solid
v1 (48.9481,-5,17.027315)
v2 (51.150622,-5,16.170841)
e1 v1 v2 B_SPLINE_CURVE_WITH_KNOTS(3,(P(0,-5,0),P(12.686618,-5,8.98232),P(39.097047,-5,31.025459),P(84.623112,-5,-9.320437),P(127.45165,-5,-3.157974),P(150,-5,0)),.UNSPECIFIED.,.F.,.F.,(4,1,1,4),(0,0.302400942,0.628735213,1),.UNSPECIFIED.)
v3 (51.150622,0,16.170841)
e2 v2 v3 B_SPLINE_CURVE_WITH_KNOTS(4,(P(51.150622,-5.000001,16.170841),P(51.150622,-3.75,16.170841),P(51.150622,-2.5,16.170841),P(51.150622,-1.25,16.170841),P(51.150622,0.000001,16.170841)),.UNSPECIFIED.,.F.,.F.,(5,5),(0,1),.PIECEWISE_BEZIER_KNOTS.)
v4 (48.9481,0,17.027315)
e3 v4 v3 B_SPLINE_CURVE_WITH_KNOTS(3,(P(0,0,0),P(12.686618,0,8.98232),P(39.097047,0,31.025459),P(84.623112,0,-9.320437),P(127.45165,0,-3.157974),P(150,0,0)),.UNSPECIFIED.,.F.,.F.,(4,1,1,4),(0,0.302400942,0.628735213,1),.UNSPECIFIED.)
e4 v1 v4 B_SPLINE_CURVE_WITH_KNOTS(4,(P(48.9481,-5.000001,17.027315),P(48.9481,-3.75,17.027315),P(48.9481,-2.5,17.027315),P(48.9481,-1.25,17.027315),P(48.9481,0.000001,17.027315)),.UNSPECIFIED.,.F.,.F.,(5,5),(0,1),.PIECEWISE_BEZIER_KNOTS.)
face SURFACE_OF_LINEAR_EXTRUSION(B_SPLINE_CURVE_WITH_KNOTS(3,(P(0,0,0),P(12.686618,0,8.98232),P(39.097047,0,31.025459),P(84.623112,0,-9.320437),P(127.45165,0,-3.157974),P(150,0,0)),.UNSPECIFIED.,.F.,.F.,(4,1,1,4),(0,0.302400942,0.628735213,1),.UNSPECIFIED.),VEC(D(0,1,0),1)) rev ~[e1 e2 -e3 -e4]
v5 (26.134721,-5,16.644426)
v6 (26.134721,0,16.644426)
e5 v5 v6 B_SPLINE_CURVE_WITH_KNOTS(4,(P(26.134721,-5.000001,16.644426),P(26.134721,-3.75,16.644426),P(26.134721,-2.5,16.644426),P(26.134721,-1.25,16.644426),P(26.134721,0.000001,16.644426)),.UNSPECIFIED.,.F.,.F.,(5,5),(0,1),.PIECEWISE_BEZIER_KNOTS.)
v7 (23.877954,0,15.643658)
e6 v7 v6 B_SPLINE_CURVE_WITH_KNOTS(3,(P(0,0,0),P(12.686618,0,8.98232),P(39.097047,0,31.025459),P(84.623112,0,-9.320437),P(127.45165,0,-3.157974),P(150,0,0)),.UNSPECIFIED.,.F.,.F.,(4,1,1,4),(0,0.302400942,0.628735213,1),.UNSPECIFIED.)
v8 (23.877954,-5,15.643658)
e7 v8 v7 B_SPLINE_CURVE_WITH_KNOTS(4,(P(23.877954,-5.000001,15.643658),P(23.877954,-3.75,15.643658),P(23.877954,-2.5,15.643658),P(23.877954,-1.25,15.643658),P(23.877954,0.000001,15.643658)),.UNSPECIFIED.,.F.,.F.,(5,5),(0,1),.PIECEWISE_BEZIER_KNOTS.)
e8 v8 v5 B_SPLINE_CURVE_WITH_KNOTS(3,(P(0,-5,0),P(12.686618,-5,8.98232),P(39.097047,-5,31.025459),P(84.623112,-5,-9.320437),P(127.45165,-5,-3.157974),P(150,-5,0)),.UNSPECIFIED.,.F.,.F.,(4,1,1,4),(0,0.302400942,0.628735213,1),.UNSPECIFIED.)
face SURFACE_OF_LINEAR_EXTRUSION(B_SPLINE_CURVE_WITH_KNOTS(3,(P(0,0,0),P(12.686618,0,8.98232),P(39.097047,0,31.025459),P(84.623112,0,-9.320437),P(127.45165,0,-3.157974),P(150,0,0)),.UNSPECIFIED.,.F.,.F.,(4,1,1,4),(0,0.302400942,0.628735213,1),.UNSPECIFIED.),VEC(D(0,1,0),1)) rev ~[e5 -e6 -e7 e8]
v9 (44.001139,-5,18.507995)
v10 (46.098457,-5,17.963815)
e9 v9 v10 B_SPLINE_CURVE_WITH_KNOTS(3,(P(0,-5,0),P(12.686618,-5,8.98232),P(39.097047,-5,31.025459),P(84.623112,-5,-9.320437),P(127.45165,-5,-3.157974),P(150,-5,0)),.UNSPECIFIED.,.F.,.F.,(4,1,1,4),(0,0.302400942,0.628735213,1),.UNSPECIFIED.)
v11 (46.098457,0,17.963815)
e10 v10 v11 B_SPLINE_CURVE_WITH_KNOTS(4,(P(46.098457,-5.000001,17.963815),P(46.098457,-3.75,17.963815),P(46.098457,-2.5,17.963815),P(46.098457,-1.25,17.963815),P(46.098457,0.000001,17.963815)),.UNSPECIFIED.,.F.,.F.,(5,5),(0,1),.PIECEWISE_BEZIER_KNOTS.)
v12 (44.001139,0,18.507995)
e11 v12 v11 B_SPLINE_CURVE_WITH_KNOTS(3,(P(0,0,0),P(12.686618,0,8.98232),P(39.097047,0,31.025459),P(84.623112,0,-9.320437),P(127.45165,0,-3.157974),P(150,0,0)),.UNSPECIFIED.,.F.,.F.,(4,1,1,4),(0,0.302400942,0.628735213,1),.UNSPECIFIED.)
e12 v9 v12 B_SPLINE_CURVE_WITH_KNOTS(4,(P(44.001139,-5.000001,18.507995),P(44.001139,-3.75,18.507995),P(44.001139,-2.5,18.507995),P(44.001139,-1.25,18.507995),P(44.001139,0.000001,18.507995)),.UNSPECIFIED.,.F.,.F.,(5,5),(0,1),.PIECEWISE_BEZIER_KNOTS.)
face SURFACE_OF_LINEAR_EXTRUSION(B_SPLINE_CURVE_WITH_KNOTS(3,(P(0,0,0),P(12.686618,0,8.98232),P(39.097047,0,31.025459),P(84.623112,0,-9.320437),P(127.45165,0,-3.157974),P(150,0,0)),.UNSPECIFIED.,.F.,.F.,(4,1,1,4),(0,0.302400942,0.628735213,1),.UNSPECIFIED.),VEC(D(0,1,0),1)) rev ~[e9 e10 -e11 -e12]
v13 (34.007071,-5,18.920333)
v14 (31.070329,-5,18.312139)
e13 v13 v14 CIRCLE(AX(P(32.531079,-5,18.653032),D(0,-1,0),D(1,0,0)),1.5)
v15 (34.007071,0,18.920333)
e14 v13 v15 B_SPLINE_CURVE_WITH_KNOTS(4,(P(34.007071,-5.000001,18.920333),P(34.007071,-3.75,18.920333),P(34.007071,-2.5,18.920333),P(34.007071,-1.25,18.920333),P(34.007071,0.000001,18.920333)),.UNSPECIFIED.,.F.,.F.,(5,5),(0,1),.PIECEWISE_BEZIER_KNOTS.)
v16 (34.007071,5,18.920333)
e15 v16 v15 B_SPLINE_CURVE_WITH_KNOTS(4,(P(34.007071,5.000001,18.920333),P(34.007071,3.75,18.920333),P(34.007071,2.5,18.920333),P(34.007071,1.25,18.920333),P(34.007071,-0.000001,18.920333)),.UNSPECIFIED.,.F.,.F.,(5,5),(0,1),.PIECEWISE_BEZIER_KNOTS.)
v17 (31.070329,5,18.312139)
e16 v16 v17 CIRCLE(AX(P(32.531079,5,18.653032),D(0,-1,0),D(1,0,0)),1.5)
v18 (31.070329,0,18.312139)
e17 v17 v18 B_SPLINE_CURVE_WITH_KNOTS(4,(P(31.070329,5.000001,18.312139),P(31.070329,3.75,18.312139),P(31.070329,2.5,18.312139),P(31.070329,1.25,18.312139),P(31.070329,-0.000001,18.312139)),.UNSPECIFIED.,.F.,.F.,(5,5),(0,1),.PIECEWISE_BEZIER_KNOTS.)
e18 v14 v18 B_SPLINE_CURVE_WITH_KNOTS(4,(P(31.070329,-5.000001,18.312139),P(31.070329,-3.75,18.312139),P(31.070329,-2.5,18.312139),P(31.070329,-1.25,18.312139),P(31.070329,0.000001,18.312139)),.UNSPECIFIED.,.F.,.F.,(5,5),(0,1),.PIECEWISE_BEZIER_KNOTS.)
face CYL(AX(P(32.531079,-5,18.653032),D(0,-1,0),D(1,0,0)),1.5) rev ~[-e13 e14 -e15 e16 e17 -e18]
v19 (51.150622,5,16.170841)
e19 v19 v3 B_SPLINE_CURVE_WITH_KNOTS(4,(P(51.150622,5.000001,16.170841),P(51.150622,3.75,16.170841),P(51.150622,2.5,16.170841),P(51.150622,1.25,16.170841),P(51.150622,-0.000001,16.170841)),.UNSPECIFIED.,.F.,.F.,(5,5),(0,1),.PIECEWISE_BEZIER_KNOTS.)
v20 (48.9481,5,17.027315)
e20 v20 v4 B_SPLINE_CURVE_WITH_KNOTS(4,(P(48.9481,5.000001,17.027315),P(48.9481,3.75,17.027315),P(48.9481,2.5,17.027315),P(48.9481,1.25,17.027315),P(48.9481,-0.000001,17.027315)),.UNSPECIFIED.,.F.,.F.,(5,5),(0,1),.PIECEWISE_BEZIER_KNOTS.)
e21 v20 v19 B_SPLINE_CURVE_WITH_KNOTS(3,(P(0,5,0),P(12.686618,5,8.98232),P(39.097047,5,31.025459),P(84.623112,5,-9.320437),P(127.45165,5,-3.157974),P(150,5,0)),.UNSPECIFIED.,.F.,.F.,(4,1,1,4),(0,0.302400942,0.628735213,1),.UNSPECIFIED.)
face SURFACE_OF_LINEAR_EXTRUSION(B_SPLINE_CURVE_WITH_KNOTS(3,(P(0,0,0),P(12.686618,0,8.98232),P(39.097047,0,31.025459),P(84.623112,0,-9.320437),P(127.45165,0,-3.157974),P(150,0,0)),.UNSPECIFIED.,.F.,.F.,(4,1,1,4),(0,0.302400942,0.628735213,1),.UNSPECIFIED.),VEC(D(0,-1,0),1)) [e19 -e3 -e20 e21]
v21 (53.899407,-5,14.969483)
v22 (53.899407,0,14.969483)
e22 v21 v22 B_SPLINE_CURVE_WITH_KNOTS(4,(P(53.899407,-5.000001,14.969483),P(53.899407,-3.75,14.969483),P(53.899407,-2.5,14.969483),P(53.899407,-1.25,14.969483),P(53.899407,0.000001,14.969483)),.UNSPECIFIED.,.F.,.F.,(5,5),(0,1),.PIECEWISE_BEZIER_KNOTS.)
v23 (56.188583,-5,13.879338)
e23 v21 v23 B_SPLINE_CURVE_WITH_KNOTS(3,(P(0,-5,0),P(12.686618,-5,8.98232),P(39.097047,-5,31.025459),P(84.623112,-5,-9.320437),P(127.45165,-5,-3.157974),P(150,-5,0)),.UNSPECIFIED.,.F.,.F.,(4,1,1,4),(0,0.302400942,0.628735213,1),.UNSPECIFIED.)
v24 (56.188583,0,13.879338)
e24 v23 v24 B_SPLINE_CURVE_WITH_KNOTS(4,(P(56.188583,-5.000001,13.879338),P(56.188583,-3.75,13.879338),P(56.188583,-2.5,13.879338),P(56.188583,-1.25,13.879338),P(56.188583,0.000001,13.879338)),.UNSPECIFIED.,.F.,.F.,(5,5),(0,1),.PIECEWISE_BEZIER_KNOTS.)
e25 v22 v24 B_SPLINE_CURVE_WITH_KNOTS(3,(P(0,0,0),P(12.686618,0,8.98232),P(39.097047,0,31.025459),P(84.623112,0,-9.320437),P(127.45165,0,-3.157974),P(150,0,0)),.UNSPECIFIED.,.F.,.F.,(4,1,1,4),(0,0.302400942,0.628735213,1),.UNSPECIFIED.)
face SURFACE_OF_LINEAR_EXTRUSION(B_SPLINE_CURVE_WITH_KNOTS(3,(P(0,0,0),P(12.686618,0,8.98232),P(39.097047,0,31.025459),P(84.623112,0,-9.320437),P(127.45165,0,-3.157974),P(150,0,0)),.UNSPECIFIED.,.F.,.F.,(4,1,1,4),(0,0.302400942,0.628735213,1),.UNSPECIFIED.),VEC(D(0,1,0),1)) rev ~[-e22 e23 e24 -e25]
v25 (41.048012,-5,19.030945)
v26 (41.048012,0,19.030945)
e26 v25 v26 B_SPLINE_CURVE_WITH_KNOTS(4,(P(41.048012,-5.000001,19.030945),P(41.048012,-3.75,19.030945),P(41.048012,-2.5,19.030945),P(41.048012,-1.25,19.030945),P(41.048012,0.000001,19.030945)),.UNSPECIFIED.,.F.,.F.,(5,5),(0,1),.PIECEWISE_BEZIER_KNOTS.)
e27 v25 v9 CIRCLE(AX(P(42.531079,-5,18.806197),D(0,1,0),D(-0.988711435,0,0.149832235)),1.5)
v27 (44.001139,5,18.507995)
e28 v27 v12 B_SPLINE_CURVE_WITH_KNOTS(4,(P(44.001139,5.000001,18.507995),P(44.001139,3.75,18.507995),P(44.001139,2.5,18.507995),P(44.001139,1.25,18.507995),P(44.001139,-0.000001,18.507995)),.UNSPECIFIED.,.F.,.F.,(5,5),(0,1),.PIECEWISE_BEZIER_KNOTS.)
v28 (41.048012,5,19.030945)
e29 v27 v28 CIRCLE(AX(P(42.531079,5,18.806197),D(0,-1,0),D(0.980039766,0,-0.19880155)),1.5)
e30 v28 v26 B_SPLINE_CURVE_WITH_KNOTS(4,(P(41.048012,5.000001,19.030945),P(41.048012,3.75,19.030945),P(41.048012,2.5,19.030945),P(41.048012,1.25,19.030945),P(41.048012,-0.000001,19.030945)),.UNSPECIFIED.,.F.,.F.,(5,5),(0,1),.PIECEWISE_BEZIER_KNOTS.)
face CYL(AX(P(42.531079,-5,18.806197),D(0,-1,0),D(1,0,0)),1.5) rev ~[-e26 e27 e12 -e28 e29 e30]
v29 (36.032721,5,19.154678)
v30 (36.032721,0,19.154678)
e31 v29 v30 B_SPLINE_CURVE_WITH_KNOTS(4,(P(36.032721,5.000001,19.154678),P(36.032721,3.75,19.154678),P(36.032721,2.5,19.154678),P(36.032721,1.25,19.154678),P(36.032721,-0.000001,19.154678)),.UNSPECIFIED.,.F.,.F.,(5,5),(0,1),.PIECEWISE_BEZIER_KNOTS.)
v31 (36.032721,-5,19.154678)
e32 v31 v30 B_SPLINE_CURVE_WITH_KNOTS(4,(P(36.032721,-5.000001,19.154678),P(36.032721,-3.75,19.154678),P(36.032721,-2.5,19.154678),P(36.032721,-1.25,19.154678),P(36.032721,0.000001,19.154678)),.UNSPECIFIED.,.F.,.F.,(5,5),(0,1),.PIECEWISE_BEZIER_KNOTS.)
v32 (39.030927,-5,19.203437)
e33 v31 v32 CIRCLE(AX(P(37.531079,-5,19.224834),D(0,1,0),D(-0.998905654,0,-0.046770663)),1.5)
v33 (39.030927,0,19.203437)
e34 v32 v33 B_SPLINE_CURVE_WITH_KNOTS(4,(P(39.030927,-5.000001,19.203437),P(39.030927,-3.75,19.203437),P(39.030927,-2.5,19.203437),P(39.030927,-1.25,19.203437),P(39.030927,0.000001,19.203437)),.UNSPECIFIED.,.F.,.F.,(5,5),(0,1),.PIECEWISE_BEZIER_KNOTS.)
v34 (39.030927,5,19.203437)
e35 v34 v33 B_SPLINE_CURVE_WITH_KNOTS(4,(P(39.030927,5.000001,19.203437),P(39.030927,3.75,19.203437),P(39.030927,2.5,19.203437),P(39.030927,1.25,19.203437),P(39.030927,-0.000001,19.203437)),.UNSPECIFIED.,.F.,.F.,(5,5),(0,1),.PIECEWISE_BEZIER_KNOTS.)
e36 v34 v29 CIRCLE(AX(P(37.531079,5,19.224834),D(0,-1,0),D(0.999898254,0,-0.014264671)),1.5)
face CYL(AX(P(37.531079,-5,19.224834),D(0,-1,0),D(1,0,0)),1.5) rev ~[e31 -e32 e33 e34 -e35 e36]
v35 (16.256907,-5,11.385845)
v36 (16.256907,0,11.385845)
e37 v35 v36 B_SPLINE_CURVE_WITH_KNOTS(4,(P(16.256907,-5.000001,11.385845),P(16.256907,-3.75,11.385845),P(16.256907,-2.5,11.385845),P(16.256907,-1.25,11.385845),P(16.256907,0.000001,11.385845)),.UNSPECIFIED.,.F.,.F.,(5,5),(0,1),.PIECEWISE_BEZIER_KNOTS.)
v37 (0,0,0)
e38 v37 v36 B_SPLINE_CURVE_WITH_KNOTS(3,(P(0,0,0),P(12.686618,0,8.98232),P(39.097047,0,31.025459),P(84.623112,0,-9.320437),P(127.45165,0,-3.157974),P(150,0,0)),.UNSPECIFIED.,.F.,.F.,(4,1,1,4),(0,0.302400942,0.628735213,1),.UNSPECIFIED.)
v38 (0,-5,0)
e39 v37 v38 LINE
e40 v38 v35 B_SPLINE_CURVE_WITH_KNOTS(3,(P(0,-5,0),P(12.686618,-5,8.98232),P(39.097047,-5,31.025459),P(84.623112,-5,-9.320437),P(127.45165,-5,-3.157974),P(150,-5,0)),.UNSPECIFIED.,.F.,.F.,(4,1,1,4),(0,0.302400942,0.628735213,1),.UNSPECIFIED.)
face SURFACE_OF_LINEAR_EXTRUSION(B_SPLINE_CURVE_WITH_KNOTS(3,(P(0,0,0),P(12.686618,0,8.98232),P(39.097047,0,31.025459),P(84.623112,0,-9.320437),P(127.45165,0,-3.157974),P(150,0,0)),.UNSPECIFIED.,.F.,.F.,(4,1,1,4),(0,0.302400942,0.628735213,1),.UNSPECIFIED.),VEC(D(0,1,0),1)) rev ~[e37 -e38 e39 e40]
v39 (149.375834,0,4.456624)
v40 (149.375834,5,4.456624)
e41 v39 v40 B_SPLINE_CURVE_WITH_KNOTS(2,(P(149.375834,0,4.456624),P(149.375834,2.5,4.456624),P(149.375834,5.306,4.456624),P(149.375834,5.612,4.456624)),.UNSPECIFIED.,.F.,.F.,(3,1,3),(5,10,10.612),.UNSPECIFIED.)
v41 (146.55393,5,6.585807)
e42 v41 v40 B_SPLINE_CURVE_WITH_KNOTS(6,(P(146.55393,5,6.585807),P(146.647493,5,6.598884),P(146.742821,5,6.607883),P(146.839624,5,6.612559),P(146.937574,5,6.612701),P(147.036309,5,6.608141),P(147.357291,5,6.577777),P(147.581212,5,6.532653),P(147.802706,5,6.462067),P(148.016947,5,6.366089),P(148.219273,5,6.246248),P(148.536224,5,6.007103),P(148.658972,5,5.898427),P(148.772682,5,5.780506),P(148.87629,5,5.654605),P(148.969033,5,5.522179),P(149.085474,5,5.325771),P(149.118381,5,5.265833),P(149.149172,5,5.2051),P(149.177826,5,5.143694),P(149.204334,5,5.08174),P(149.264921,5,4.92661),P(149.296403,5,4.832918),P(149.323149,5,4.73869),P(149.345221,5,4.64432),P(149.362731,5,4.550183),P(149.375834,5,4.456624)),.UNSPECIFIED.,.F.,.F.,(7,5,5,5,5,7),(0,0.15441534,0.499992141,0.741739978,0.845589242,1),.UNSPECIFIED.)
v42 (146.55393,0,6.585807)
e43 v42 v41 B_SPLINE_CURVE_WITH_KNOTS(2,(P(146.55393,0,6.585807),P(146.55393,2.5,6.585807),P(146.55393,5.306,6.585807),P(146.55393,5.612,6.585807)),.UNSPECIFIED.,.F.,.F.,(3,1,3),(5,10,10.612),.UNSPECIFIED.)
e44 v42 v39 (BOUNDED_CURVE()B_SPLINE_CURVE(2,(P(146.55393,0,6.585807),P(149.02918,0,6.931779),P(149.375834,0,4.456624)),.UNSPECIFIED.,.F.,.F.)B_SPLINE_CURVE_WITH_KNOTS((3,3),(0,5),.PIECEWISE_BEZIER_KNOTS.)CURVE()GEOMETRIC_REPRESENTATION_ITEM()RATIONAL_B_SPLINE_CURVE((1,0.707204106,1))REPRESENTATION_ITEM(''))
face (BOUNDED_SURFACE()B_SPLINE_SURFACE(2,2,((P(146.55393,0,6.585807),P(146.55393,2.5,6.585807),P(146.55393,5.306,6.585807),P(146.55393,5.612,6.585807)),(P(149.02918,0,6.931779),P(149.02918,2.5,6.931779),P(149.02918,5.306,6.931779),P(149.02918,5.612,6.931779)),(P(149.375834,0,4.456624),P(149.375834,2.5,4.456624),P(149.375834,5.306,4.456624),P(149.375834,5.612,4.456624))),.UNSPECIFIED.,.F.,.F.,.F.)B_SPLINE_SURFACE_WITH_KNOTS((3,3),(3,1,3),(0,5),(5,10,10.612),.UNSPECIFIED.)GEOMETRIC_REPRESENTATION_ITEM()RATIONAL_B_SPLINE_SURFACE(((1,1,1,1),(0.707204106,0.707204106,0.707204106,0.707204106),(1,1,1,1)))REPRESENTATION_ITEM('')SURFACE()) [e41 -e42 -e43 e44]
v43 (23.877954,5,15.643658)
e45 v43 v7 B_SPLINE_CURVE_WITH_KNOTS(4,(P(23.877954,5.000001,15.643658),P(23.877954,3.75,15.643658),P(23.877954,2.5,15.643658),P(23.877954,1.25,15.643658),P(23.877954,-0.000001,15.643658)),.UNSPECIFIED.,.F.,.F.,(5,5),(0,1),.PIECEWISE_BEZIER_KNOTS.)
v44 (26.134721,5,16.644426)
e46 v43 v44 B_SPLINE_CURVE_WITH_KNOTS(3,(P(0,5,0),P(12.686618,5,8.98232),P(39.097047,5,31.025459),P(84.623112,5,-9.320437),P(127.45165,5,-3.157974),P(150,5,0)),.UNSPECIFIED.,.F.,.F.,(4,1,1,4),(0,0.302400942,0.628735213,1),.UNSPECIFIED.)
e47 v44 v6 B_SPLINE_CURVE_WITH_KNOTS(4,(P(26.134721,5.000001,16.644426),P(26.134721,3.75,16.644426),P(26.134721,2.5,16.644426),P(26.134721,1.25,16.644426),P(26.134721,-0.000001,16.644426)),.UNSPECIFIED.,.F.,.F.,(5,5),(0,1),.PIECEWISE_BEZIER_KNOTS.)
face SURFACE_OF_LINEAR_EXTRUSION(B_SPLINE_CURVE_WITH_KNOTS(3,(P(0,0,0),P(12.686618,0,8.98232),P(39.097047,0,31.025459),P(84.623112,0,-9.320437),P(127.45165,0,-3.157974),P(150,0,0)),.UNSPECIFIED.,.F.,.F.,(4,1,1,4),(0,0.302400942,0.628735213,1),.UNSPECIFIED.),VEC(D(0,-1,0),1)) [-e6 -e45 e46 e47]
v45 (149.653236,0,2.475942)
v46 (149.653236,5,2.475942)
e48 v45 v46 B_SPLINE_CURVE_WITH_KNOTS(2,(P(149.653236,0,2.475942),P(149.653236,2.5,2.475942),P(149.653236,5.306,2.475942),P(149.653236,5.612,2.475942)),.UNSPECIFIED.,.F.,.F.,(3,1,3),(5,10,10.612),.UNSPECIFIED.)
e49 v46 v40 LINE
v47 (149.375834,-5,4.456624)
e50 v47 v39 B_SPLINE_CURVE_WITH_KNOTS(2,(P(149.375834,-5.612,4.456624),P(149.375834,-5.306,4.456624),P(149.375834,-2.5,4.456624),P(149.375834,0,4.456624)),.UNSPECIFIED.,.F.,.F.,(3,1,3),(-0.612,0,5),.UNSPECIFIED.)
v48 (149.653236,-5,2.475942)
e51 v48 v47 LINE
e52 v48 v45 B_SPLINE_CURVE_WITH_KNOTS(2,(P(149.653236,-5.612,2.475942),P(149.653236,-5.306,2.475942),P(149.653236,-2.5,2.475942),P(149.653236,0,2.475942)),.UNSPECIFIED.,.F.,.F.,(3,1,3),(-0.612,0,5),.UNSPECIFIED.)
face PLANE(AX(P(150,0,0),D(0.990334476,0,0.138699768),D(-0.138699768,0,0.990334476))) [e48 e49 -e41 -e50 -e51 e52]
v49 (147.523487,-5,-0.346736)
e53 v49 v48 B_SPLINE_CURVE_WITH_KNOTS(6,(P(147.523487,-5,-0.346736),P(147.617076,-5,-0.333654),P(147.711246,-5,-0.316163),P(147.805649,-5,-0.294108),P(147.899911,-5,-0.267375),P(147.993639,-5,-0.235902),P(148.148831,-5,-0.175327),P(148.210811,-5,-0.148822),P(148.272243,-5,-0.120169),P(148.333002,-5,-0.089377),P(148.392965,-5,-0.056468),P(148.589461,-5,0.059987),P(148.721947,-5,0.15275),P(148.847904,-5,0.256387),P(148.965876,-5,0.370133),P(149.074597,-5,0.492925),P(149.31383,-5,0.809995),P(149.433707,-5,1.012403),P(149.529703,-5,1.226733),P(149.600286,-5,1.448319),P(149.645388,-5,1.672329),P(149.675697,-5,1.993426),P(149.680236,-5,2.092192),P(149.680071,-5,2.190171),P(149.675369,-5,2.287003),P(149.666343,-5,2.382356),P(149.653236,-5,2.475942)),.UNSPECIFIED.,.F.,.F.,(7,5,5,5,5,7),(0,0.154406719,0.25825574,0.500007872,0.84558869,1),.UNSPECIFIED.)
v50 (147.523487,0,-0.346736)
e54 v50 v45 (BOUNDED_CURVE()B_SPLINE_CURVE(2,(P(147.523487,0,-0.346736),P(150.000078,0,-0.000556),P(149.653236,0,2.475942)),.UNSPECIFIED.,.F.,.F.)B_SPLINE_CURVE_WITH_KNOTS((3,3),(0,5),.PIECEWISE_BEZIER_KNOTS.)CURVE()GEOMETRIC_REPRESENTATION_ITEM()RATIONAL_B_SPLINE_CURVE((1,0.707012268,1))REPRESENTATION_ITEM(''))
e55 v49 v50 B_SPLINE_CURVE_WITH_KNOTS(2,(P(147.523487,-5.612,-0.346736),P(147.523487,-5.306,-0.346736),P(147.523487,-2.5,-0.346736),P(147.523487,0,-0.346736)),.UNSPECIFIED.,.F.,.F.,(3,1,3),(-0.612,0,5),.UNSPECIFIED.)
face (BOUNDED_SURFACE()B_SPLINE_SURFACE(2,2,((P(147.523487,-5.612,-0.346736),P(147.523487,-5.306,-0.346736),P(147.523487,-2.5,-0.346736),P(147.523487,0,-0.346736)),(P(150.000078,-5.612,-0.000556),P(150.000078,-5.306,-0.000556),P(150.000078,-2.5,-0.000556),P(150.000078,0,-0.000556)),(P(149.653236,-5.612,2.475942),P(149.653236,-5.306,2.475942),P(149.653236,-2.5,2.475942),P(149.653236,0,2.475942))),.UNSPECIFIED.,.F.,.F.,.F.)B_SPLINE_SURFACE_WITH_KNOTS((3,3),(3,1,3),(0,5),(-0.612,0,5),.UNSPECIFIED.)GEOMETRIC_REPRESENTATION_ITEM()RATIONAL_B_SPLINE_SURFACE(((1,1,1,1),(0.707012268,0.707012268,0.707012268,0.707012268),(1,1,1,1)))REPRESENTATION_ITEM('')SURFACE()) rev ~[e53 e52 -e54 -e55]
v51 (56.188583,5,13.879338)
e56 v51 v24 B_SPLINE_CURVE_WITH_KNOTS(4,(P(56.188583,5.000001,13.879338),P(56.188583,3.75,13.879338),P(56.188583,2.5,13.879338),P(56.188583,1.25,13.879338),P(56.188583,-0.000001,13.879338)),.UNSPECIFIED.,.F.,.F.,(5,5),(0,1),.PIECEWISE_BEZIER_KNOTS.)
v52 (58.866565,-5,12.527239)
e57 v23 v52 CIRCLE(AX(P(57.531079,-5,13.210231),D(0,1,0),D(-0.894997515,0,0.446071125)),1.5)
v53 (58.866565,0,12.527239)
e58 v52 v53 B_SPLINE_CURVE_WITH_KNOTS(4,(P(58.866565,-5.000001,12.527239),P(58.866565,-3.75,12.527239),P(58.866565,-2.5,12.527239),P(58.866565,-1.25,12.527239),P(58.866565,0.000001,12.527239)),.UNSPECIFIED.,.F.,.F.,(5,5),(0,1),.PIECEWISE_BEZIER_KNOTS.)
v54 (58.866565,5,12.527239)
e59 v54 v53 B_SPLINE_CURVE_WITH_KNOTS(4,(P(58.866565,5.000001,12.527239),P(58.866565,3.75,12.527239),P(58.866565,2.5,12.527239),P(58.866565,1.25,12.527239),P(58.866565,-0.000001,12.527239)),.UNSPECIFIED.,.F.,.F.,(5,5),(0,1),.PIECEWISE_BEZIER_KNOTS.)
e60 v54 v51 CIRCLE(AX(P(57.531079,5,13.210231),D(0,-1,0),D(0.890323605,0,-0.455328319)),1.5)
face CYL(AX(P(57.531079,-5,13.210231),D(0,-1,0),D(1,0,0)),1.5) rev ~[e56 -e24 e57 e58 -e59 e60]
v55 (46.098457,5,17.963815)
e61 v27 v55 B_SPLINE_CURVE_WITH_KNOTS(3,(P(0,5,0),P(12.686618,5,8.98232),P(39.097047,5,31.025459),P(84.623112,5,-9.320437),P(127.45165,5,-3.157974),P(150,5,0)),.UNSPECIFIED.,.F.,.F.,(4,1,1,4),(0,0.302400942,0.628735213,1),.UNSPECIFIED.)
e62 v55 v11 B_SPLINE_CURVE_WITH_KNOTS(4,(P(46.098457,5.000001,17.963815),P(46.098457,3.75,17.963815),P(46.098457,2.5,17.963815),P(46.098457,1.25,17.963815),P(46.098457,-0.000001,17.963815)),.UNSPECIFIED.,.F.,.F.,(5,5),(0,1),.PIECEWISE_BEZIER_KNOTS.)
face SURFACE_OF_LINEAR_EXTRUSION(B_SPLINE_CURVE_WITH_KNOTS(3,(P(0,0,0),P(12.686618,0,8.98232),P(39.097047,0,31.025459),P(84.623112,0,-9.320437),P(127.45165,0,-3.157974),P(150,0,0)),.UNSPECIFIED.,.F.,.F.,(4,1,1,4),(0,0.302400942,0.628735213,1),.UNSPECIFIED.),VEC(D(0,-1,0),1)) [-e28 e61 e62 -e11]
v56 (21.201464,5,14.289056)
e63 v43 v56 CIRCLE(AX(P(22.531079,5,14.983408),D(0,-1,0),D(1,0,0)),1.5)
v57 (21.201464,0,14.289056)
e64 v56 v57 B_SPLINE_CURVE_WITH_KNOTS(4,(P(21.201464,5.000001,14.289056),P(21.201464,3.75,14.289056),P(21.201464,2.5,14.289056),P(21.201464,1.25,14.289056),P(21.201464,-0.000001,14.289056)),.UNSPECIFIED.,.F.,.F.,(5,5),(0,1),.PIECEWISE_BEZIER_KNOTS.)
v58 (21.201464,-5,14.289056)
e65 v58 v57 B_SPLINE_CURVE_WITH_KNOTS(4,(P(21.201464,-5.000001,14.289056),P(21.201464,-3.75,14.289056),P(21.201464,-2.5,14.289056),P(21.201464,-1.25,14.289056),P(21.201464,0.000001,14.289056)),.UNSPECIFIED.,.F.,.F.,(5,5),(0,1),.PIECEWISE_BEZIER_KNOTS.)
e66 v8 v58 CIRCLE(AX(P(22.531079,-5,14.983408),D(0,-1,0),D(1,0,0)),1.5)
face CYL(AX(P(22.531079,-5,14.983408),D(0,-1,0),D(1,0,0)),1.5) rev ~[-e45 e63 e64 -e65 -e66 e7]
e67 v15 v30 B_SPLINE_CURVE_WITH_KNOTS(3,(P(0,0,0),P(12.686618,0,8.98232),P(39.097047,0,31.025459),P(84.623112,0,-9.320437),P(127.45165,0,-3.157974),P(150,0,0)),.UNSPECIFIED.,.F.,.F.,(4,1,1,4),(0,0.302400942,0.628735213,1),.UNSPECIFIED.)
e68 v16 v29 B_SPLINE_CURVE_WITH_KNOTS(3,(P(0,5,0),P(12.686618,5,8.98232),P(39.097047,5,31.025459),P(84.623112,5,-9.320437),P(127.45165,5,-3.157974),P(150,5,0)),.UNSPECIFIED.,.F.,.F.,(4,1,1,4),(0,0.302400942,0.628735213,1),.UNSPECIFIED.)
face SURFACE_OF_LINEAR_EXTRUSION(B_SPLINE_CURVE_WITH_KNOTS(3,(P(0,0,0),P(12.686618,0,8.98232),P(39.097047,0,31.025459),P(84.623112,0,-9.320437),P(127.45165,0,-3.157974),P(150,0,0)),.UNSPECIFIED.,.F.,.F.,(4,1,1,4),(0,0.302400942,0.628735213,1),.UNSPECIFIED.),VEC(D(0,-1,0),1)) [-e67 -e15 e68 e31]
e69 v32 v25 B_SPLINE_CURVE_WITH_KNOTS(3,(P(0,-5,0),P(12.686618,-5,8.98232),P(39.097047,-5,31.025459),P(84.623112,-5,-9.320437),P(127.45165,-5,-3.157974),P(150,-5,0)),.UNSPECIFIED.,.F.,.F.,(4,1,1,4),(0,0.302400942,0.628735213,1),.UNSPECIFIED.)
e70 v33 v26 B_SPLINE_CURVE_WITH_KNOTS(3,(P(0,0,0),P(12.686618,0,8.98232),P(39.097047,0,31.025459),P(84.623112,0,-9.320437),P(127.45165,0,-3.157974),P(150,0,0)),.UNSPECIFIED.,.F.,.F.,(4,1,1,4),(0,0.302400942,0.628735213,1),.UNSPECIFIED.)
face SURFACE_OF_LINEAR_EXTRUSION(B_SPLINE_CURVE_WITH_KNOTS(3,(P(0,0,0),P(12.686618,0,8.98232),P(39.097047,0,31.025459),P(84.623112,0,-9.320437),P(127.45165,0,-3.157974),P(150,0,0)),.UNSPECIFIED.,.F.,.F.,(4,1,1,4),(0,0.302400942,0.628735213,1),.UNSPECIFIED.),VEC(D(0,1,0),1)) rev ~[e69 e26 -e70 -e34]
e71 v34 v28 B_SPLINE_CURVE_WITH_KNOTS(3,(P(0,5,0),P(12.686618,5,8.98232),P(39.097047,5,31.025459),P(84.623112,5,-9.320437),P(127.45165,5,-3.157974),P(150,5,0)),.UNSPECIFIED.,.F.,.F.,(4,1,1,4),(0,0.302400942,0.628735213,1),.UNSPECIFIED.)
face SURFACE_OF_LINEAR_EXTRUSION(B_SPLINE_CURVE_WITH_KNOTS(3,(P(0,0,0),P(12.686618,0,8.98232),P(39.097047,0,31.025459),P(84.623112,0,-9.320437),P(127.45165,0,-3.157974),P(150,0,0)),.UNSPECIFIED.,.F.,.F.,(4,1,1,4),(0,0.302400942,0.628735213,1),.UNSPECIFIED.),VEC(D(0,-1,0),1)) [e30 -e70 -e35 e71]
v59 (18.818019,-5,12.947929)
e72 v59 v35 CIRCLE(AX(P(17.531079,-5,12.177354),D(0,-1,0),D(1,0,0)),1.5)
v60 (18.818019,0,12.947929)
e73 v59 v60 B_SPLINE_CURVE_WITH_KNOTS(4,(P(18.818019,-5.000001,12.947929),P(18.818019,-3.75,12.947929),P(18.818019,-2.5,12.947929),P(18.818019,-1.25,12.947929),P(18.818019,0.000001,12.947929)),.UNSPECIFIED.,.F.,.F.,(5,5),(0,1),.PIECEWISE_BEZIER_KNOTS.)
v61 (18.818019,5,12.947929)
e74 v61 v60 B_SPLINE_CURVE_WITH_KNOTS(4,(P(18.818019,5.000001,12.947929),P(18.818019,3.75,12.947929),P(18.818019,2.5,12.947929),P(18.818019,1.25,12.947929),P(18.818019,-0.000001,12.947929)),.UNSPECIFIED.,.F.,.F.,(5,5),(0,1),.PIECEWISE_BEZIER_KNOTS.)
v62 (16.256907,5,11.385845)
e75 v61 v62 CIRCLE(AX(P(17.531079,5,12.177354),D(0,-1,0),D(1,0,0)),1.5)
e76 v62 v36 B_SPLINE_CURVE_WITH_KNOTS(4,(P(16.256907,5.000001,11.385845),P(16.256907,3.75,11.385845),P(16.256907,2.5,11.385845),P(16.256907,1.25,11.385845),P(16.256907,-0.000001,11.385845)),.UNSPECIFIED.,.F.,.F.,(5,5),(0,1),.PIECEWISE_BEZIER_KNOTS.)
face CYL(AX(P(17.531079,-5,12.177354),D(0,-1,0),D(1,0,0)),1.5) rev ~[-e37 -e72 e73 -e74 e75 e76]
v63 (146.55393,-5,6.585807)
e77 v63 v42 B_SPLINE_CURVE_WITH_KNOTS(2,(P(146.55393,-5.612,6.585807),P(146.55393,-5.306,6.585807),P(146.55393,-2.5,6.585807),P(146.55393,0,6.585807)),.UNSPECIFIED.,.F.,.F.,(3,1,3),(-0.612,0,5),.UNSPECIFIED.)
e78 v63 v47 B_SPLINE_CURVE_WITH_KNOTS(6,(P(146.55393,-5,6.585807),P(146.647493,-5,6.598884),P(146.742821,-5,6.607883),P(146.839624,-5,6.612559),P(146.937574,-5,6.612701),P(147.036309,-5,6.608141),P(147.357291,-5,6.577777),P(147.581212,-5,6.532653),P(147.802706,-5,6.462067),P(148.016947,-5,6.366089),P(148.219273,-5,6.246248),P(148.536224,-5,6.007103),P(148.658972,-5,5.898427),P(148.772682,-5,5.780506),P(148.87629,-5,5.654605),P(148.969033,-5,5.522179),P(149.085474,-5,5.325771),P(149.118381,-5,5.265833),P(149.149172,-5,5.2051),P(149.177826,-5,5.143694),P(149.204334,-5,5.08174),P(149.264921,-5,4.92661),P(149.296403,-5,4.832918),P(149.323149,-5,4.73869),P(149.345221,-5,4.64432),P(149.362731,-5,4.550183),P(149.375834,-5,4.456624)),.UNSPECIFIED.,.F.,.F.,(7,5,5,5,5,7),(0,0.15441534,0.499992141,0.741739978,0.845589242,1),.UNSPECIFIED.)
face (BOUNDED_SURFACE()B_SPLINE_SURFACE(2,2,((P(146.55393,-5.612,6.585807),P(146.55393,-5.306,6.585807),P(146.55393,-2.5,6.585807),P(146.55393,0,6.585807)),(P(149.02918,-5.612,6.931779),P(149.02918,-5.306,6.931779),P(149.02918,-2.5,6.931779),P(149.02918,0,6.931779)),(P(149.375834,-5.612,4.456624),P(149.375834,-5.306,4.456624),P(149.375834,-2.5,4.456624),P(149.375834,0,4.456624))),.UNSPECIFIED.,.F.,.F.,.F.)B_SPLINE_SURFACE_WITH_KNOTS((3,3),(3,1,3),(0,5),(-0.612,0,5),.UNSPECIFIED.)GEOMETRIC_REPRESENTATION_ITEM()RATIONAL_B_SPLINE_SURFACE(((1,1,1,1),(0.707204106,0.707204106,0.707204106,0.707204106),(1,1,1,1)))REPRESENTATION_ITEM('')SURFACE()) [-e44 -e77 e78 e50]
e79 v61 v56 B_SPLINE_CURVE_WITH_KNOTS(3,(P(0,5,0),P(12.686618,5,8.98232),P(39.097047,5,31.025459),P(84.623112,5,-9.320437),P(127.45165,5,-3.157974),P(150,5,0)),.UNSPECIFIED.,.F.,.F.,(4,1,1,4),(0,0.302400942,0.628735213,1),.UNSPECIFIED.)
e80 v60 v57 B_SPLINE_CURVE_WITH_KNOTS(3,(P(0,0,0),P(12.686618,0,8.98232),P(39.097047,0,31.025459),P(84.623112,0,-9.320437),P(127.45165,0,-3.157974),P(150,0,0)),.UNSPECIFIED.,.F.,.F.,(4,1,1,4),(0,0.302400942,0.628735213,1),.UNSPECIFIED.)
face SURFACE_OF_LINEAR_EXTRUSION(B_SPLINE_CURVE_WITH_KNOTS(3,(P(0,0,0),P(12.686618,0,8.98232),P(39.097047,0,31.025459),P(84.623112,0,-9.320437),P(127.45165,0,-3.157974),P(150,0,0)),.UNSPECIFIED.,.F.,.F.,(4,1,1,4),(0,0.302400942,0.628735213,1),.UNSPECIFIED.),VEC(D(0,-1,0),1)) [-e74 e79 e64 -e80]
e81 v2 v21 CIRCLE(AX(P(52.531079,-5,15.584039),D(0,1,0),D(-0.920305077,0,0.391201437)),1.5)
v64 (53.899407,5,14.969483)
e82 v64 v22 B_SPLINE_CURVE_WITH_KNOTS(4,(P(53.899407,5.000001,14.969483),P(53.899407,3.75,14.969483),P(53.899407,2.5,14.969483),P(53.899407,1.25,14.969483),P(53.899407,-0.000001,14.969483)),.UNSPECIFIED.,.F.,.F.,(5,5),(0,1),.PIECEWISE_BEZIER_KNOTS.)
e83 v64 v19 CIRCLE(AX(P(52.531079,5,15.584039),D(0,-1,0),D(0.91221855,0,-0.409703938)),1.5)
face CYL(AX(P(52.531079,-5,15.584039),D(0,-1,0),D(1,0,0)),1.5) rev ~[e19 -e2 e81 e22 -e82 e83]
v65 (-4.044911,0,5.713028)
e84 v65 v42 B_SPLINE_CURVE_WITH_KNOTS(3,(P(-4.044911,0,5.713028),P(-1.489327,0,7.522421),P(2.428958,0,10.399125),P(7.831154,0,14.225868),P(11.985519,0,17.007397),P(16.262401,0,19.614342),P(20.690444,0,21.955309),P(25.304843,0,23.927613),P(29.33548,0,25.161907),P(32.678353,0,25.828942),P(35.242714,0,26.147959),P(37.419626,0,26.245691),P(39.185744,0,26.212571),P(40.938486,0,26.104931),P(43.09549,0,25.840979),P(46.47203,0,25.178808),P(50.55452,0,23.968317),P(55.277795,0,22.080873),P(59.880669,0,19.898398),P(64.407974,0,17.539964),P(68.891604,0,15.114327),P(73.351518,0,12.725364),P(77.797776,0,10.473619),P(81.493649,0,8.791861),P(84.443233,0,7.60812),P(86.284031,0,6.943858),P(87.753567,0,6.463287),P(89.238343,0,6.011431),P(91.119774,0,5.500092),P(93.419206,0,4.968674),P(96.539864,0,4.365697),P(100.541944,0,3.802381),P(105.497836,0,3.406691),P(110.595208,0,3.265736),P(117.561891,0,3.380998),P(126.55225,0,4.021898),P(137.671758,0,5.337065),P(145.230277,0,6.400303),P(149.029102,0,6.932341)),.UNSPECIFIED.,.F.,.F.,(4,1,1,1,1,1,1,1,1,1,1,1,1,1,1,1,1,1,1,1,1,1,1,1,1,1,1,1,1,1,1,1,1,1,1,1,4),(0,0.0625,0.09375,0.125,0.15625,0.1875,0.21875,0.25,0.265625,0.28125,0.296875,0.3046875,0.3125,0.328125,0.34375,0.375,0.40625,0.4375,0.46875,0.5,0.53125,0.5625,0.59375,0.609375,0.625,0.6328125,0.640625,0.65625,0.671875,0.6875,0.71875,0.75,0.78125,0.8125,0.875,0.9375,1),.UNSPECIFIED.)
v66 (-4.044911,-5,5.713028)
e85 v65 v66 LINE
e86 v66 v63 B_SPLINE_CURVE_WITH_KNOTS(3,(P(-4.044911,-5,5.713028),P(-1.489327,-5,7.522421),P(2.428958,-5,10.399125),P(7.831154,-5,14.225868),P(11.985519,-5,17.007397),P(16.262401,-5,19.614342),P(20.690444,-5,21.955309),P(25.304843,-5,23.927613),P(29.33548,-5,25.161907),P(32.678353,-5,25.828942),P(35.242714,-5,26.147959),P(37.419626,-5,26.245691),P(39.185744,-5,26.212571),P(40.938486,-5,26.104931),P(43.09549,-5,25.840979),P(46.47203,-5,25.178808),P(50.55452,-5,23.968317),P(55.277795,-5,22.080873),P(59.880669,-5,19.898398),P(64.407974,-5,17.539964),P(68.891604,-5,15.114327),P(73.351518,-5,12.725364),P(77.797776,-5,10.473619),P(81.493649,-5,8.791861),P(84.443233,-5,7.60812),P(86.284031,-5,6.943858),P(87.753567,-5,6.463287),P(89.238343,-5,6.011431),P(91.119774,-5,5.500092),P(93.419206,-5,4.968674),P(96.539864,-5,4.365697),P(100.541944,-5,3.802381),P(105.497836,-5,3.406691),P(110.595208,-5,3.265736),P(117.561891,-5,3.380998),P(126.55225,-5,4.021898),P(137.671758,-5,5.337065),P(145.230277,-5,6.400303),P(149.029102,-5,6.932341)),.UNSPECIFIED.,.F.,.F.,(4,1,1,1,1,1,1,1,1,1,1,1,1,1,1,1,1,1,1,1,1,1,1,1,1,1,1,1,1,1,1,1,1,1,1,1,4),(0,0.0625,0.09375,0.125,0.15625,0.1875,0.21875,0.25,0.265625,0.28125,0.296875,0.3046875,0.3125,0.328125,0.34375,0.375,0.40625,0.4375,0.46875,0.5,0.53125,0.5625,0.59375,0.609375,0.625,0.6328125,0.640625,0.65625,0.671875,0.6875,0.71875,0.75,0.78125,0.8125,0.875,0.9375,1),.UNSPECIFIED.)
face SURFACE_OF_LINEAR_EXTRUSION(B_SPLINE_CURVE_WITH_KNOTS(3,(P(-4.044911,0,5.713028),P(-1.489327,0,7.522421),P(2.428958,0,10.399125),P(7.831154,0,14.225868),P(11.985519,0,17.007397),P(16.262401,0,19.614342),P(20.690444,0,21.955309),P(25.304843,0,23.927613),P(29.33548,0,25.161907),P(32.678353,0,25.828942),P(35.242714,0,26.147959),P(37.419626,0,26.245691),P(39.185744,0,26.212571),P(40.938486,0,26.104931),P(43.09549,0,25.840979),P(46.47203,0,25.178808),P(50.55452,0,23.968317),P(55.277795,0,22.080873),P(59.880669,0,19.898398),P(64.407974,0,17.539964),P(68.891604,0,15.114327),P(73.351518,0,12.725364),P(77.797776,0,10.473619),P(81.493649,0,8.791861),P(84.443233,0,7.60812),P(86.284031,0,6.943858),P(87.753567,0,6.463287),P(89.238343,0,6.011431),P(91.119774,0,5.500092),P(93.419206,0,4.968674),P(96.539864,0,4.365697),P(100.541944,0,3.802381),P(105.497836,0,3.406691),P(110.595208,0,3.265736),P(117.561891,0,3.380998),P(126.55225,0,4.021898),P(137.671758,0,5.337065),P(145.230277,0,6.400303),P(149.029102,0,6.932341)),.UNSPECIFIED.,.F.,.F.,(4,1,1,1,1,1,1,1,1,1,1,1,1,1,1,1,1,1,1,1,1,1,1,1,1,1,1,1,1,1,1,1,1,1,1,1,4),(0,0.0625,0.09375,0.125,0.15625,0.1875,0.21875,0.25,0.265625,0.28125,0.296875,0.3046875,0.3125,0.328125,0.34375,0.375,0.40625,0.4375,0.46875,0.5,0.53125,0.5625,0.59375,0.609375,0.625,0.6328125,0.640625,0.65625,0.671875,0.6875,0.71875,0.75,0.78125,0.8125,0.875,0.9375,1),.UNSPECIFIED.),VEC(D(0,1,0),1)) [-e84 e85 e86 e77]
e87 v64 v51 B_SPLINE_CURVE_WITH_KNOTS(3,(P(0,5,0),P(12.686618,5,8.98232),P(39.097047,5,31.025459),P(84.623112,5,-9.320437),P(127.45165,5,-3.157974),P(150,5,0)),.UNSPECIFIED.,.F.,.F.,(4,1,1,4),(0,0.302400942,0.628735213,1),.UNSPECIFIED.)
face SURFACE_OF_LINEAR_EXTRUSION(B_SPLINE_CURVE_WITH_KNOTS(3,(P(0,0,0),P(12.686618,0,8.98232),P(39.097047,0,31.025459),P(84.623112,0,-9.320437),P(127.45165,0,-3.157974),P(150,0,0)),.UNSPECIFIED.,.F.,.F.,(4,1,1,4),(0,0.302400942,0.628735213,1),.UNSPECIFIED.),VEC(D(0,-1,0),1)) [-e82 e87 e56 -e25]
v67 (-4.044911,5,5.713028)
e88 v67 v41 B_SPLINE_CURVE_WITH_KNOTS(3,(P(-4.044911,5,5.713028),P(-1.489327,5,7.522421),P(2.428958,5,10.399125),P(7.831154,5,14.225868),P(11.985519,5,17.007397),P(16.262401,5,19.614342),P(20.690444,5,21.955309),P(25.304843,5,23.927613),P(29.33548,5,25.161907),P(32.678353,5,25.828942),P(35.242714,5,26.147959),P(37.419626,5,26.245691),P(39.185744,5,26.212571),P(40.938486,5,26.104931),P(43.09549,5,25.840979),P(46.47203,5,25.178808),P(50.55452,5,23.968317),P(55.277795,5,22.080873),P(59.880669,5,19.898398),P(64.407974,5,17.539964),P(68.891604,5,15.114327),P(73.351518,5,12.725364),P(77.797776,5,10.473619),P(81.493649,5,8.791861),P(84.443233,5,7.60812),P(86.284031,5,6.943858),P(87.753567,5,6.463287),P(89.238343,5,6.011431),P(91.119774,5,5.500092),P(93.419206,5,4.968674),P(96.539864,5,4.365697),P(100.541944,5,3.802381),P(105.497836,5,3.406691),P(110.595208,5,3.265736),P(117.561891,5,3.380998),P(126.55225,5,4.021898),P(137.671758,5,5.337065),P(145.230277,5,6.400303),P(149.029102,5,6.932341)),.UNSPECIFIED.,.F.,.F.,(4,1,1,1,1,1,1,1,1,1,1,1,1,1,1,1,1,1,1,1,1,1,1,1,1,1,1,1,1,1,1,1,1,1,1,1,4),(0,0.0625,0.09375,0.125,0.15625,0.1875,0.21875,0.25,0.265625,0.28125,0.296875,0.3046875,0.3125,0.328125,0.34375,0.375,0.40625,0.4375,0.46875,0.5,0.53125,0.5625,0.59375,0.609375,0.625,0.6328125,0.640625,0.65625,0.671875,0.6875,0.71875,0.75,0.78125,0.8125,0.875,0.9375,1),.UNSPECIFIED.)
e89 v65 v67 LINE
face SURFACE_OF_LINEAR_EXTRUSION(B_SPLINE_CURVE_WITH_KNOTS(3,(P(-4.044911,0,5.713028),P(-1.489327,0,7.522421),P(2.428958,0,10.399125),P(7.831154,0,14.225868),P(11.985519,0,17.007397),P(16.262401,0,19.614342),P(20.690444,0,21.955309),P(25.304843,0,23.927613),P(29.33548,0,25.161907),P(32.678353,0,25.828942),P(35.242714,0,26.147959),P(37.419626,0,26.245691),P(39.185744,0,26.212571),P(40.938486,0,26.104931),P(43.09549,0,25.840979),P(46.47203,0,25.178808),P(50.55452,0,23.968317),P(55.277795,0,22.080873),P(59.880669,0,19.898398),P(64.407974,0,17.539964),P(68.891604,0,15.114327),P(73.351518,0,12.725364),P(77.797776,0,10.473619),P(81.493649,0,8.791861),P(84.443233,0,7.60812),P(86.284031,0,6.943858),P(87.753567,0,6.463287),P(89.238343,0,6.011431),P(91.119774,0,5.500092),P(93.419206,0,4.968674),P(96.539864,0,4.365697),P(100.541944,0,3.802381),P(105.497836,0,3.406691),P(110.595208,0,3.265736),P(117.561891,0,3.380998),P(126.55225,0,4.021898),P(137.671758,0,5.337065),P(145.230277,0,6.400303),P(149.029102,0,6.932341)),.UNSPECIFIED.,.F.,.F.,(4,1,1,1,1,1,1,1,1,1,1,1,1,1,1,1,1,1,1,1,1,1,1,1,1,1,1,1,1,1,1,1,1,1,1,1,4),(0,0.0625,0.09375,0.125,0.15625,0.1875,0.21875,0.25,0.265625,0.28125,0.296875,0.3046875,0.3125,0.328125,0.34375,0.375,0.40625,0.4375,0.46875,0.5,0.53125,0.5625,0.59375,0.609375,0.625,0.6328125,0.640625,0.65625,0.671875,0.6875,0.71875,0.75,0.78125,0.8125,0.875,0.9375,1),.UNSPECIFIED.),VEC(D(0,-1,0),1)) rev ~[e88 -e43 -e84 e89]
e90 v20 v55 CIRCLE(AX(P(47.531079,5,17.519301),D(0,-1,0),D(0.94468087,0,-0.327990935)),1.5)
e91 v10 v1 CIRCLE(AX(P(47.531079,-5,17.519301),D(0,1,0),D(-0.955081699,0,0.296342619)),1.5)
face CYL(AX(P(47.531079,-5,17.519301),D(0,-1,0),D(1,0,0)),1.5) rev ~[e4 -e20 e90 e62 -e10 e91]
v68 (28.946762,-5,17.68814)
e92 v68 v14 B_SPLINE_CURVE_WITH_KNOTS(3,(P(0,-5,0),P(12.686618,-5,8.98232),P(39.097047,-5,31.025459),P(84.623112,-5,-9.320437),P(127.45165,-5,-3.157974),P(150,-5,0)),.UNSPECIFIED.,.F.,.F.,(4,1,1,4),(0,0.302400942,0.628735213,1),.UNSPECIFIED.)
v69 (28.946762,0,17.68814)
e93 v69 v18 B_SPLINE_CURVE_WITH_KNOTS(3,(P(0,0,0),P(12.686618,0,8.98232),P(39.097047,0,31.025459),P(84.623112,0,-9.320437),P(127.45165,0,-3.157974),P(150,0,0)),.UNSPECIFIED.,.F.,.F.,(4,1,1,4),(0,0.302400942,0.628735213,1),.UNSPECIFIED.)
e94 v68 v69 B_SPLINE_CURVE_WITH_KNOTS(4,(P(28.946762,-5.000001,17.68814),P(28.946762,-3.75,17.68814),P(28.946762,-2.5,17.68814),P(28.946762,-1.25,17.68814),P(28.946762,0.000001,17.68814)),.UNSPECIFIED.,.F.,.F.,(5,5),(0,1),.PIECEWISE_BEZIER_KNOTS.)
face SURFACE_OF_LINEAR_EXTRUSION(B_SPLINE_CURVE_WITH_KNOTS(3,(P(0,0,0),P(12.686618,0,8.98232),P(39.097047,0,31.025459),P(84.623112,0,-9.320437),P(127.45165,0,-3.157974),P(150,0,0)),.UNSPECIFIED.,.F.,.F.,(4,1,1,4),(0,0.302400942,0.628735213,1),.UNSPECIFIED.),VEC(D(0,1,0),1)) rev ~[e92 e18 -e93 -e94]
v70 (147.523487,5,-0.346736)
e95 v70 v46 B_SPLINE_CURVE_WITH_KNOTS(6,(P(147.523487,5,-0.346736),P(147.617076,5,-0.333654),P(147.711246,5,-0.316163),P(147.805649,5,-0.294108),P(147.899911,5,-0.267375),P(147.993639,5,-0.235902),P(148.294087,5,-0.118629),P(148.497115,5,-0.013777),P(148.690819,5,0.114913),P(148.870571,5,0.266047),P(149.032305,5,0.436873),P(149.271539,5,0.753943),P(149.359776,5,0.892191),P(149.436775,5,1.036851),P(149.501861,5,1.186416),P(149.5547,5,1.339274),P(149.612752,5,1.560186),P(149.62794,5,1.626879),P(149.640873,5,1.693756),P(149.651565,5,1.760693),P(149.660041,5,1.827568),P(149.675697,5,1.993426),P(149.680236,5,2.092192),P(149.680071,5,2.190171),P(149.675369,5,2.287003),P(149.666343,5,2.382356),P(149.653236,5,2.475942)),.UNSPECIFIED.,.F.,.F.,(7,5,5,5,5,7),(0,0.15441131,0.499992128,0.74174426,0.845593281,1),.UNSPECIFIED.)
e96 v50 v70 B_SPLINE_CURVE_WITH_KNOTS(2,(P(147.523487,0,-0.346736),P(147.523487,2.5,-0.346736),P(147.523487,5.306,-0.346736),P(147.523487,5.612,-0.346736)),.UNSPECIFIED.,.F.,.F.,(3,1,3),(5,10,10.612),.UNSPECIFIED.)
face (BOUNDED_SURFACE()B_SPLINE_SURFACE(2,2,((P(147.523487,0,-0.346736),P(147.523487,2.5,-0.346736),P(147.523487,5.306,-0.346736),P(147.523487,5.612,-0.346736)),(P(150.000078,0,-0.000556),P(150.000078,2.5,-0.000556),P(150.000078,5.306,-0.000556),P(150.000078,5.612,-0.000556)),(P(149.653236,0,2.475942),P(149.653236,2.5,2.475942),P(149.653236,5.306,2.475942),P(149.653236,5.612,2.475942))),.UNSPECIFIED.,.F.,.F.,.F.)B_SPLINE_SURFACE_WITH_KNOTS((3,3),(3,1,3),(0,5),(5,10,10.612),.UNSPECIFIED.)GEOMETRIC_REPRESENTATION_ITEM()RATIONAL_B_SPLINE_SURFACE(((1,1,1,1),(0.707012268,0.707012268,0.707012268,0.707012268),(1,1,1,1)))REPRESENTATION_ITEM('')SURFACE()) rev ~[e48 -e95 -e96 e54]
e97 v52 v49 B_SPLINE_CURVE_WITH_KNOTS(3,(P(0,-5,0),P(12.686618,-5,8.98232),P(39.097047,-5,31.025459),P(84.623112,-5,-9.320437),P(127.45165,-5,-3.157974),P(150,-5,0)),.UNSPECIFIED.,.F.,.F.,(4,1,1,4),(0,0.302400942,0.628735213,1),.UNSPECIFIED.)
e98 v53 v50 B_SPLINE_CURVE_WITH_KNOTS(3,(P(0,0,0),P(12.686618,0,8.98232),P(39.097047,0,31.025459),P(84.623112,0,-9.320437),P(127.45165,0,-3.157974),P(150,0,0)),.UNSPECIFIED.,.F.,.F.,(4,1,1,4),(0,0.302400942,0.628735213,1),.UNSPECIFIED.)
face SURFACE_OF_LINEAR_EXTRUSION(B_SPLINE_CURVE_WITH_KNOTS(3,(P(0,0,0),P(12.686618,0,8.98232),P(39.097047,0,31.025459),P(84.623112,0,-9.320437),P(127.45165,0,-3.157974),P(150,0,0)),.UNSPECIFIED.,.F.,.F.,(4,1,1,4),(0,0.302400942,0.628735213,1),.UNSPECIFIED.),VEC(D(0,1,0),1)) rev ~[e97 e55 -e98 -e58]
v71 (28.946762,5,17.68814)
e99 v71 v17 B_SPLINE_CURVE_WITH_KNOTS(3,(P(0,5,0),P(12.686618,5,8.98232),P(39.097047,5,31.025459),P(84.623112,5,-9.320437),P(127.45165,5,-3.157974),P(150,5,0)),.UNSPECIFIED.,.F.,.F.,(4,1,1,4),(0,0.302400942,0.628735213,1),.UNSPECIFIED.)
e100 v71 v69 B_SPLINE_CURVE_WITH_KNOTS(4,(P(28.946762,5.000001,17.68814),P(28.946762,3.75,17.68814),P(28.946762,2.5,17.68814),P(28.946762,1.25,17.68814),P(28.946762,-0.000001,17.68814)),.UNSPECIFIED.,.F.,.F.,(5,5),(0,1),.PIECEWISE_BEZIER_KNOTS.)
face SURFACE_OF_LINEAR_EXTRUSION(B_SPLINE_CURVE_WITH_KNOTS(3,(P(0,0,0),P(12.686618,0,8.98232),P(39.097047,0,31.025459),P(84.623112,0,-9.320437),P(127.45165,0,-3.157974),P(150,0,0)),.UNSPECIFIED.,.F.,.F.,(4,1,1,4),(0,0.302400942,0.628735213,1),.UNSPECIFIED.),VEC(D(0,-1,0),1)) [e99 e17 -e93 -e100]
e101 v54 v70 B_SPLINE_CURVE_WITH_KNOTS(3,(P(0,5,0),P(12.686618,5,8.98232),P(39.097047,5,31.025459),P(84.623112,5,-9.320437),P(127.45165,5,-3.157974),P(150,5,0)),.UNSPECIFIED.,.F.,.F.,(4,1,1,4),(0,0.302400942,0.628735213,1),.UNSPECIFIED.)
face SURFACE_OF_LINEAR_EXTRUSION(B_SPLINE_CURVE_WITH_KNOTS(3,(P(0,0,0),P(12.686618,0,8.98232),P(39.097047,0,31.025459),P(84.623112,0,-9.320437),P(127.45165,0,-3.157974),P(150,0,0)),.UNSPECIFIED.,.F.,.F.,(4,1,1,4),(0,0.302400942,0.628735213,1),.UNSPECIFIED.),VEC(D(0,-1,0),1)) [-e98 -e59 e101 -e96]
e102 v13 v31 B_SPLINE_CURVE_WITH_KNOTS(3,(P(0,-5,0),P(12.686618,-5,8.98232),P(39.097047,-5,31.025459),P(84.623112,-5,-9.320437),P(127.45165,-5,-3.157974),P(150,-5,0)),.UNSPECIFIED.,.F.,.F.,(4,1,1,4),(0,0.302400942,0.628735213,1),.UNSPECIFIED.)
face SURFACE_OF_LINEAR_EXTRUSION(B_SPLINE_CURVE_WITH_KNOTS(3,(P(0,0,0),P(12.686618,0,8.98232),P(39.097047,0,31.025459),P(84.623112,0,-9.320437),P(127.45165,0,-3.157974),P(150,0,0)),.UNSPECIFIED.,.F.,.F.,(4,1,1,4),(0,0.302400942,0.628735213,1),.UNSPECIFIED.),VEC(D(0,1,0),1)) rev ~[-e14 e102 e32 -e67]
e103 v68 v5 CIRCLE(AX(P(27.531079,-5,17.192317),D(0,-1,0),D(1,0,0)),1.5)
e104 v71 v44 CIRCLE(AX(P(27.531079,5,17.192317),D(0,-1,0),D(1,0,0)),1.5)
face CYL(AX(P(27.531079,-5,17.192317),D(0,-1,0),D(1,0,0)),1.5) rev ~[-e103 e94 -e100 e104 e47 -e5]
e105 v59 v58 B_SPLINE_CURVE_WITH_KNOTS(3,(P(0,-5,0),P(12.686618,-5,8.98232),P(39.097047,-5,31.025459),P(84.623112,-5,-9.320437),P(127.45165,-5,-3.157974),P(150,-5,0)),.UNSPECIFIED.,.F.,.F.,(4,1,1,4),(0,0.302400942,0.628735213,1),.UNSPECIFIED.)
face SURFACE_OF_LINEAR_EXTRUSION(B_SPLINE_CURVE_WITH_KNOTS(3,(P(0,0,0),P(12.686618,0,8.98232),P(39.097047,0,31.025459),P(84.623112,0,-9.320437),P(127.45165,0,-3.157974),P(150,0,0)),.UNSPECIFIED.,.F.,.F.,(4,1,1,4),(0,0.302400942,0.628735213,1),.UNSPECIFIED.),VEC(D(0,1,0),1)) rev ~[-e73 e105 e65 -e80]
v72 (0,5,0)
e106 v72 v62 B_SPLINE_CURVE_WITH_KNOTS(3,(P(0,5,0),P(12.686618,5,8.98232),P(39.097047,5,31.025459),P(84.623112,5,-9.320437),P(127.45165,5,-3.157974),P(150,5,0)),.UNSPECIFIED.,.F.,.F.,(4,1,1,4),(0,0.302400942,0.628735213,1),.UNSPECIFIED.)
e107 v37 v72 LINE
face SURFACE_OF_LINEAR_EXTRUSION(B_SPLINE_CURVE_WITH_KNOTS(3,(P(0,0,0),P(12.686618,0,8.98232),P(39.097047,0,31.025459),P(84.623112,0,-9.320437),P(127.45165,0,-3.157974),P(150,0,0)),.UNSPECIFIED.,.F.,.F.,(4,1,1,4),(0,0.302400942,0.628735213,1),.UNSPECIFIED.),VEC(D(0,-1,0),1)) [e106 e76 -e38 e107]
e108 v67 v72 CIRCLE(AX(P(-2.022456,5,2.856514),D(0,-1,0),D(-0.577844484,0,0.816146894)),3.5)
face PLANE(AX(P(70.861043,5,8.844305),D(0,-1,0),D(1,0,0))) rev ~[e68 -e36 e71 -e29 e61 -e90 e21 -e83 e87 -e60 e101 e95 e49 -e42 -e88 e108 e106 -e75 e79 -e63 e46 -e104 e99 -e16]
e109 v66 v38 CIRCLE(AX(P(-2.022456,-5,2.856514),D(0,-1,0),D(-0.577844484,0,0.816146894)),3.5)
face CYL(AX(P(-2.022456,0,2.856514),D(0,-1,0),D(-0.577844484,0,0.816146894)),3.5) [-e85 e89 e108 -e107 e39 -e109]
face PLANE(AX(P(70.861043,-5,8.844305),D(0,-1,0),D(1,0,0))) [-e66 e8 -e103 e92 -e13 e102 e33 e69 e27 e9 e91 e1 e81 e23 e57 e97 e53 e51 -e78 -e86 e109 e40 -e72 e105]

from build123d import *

# Parameters (mm, degrees)
F1_DEPTH = 5
F2_R     = 2.5
F3_R     = 1.5
F4_DEPTH = 10.0010001


# Not quite as in the source:
# - the dataset's text gives a spline's control points without its knots; the knots are read off the source's solid


with BuildPart() as f1:
    # F0 (on Front) → F1 (new body, symmetric)
    with BuildSketch(Plane.XZ):
        with BuildLine():
            ThreePointArc((-4.0449113911, 5.7130282546), (-4.8789698229, 0.8340584318), (0, 0))
            add(Edge.make_bspline(
                [(0, 0), (12.6866183221, 8.9823198273), (39.097046681, 31.0254585121), (84.6231120805, -9.3204370609), (127.451649596, -3.1579744512), (150, 0)],
                knots=[0, 0, 0, 0, 0.3024009423, 0.6287352131, 1, 1, 1, 1], degree=3))
            Line((150, 0), (149.0291016229, 6.9323413319))
            add(Edge.make_bspline(
                [(-4.0449113911, 5.7130282546), (-1.4893265055, 7.522421444), (2.4289578755, 10.3991251109), (7.8311540893, 14.2258677584), (11.985518828, 17.0073967049), (16.2624014486, 19.6143417246), (20.6904437749, 21.9553087459), (25.3048430013, 23.9276125636), (29.3354802395, 25.1619067391), (32.6783528938, 25.828942319), (35.2427144442, 26.1479585874), (37.419626365, 26.2456905562), (39.1857443489, 26.2125714545), (40.9384858731, 26.1049312213), (43.0954900321, 25.8409787708), (46.4720299209, 25.1788075072), (50.5545204313, 23.9683165065), (55.2777949463, 22.0808731164), (59.8806691618, 19.8983979978), (64.4079741748, 17.5399643684), (68.8916038218, 15.1143270568), (73.3515183232, 12.7253635973), (77.7977758185, 10.4736185968), (81.4936492304, 8.7918611912), (84.4432333572, 7.608120023), (86.2840306834, 6.9438576049), (87.7535671011, 6.4632867232), (89.2383433444, 6.0114309597), (91.1197744412, 5.5000916427), (93.4192059549, 4.9686735981), (96.5398637001, 4.3656966777), (100.5419436116, 3.8023805188), (105.4978361754, 3.4066907033), (110.5952082283, 3.2657358671), (117.5618909593, 3.3809979789), (126.5522503494, 4.0218977706), (137.6717582852, 5.3370647038), (145.2302773967, 6.4003028618), (149.0291016229, 6.9323413319)],
                knots=[0, 0, 0, 0, 0.0625, 0.09375, 0.125, 0.15625, 0.1875, 0.21875, 0.25, 0.265625, 0.28125, 0.296875, 0.3046875, 0.3125, 0.328125, 0.34375, 0.375, 0.40625, 0.4375, 0.46875, 0.5, 0.53125, 0.5625, 0.59375, 0.609375, 0.625, 0.6328125, 0.640625, 0.65625, 0.671875, 0.6875, 0.71875, 0.75, 0.78125, 0.8125, 0.875, 0.9375, 1, 1, 1, 1], degree=3))
        make_face()
    extrude(amount=F1_DEPTH, both=True)

    # F2
    f2_edges = [f1.edges().sort_by_distance(p)[0] for p in [
        (149.029102, 2.5, 6.932341),
        (150, 2.5, 0),
        (149.029102, -2.5, 6.932341),
        (150, -2.5, 0),
    ]]
    fillet(f2_edges, radius=F2_R)

    # F3 (on face) → F4 (cut, through all)
    with BuildSketch(Plane.XZ.offset(5)):
        with Locations((37.5310791936, 19.2248344713)):
            Circle(F3_R)
        with Locations((32.5310791936, 18.6530319414)):
            Circle(F3_R)
        with Locations((27.5310791936, 17.192316528)):
            Circle(F3_R)
        with Locations((22.5310791936, 14.983407983)):
            Circle(F3_R)
        with Locations((17.5310791936, 12.1773542976)):
            Circle(F3_R)
        with Locations((42.5310791936, 18.806197108)):
            Circle(F3_R)
        with Locations((47.5310791936, 17.51930095)):
            Circle(F3_R)
        with Locations((52.5310791936, 15.5840389676)):
            Circle(F3_R)
        with Locations((57.5310791936, 13.2102312001)):
            Circle(F3_R)
    extrude(amount=-F4_DEPTH, mode=Mode.SUBTRACT)


solid = f1.part
